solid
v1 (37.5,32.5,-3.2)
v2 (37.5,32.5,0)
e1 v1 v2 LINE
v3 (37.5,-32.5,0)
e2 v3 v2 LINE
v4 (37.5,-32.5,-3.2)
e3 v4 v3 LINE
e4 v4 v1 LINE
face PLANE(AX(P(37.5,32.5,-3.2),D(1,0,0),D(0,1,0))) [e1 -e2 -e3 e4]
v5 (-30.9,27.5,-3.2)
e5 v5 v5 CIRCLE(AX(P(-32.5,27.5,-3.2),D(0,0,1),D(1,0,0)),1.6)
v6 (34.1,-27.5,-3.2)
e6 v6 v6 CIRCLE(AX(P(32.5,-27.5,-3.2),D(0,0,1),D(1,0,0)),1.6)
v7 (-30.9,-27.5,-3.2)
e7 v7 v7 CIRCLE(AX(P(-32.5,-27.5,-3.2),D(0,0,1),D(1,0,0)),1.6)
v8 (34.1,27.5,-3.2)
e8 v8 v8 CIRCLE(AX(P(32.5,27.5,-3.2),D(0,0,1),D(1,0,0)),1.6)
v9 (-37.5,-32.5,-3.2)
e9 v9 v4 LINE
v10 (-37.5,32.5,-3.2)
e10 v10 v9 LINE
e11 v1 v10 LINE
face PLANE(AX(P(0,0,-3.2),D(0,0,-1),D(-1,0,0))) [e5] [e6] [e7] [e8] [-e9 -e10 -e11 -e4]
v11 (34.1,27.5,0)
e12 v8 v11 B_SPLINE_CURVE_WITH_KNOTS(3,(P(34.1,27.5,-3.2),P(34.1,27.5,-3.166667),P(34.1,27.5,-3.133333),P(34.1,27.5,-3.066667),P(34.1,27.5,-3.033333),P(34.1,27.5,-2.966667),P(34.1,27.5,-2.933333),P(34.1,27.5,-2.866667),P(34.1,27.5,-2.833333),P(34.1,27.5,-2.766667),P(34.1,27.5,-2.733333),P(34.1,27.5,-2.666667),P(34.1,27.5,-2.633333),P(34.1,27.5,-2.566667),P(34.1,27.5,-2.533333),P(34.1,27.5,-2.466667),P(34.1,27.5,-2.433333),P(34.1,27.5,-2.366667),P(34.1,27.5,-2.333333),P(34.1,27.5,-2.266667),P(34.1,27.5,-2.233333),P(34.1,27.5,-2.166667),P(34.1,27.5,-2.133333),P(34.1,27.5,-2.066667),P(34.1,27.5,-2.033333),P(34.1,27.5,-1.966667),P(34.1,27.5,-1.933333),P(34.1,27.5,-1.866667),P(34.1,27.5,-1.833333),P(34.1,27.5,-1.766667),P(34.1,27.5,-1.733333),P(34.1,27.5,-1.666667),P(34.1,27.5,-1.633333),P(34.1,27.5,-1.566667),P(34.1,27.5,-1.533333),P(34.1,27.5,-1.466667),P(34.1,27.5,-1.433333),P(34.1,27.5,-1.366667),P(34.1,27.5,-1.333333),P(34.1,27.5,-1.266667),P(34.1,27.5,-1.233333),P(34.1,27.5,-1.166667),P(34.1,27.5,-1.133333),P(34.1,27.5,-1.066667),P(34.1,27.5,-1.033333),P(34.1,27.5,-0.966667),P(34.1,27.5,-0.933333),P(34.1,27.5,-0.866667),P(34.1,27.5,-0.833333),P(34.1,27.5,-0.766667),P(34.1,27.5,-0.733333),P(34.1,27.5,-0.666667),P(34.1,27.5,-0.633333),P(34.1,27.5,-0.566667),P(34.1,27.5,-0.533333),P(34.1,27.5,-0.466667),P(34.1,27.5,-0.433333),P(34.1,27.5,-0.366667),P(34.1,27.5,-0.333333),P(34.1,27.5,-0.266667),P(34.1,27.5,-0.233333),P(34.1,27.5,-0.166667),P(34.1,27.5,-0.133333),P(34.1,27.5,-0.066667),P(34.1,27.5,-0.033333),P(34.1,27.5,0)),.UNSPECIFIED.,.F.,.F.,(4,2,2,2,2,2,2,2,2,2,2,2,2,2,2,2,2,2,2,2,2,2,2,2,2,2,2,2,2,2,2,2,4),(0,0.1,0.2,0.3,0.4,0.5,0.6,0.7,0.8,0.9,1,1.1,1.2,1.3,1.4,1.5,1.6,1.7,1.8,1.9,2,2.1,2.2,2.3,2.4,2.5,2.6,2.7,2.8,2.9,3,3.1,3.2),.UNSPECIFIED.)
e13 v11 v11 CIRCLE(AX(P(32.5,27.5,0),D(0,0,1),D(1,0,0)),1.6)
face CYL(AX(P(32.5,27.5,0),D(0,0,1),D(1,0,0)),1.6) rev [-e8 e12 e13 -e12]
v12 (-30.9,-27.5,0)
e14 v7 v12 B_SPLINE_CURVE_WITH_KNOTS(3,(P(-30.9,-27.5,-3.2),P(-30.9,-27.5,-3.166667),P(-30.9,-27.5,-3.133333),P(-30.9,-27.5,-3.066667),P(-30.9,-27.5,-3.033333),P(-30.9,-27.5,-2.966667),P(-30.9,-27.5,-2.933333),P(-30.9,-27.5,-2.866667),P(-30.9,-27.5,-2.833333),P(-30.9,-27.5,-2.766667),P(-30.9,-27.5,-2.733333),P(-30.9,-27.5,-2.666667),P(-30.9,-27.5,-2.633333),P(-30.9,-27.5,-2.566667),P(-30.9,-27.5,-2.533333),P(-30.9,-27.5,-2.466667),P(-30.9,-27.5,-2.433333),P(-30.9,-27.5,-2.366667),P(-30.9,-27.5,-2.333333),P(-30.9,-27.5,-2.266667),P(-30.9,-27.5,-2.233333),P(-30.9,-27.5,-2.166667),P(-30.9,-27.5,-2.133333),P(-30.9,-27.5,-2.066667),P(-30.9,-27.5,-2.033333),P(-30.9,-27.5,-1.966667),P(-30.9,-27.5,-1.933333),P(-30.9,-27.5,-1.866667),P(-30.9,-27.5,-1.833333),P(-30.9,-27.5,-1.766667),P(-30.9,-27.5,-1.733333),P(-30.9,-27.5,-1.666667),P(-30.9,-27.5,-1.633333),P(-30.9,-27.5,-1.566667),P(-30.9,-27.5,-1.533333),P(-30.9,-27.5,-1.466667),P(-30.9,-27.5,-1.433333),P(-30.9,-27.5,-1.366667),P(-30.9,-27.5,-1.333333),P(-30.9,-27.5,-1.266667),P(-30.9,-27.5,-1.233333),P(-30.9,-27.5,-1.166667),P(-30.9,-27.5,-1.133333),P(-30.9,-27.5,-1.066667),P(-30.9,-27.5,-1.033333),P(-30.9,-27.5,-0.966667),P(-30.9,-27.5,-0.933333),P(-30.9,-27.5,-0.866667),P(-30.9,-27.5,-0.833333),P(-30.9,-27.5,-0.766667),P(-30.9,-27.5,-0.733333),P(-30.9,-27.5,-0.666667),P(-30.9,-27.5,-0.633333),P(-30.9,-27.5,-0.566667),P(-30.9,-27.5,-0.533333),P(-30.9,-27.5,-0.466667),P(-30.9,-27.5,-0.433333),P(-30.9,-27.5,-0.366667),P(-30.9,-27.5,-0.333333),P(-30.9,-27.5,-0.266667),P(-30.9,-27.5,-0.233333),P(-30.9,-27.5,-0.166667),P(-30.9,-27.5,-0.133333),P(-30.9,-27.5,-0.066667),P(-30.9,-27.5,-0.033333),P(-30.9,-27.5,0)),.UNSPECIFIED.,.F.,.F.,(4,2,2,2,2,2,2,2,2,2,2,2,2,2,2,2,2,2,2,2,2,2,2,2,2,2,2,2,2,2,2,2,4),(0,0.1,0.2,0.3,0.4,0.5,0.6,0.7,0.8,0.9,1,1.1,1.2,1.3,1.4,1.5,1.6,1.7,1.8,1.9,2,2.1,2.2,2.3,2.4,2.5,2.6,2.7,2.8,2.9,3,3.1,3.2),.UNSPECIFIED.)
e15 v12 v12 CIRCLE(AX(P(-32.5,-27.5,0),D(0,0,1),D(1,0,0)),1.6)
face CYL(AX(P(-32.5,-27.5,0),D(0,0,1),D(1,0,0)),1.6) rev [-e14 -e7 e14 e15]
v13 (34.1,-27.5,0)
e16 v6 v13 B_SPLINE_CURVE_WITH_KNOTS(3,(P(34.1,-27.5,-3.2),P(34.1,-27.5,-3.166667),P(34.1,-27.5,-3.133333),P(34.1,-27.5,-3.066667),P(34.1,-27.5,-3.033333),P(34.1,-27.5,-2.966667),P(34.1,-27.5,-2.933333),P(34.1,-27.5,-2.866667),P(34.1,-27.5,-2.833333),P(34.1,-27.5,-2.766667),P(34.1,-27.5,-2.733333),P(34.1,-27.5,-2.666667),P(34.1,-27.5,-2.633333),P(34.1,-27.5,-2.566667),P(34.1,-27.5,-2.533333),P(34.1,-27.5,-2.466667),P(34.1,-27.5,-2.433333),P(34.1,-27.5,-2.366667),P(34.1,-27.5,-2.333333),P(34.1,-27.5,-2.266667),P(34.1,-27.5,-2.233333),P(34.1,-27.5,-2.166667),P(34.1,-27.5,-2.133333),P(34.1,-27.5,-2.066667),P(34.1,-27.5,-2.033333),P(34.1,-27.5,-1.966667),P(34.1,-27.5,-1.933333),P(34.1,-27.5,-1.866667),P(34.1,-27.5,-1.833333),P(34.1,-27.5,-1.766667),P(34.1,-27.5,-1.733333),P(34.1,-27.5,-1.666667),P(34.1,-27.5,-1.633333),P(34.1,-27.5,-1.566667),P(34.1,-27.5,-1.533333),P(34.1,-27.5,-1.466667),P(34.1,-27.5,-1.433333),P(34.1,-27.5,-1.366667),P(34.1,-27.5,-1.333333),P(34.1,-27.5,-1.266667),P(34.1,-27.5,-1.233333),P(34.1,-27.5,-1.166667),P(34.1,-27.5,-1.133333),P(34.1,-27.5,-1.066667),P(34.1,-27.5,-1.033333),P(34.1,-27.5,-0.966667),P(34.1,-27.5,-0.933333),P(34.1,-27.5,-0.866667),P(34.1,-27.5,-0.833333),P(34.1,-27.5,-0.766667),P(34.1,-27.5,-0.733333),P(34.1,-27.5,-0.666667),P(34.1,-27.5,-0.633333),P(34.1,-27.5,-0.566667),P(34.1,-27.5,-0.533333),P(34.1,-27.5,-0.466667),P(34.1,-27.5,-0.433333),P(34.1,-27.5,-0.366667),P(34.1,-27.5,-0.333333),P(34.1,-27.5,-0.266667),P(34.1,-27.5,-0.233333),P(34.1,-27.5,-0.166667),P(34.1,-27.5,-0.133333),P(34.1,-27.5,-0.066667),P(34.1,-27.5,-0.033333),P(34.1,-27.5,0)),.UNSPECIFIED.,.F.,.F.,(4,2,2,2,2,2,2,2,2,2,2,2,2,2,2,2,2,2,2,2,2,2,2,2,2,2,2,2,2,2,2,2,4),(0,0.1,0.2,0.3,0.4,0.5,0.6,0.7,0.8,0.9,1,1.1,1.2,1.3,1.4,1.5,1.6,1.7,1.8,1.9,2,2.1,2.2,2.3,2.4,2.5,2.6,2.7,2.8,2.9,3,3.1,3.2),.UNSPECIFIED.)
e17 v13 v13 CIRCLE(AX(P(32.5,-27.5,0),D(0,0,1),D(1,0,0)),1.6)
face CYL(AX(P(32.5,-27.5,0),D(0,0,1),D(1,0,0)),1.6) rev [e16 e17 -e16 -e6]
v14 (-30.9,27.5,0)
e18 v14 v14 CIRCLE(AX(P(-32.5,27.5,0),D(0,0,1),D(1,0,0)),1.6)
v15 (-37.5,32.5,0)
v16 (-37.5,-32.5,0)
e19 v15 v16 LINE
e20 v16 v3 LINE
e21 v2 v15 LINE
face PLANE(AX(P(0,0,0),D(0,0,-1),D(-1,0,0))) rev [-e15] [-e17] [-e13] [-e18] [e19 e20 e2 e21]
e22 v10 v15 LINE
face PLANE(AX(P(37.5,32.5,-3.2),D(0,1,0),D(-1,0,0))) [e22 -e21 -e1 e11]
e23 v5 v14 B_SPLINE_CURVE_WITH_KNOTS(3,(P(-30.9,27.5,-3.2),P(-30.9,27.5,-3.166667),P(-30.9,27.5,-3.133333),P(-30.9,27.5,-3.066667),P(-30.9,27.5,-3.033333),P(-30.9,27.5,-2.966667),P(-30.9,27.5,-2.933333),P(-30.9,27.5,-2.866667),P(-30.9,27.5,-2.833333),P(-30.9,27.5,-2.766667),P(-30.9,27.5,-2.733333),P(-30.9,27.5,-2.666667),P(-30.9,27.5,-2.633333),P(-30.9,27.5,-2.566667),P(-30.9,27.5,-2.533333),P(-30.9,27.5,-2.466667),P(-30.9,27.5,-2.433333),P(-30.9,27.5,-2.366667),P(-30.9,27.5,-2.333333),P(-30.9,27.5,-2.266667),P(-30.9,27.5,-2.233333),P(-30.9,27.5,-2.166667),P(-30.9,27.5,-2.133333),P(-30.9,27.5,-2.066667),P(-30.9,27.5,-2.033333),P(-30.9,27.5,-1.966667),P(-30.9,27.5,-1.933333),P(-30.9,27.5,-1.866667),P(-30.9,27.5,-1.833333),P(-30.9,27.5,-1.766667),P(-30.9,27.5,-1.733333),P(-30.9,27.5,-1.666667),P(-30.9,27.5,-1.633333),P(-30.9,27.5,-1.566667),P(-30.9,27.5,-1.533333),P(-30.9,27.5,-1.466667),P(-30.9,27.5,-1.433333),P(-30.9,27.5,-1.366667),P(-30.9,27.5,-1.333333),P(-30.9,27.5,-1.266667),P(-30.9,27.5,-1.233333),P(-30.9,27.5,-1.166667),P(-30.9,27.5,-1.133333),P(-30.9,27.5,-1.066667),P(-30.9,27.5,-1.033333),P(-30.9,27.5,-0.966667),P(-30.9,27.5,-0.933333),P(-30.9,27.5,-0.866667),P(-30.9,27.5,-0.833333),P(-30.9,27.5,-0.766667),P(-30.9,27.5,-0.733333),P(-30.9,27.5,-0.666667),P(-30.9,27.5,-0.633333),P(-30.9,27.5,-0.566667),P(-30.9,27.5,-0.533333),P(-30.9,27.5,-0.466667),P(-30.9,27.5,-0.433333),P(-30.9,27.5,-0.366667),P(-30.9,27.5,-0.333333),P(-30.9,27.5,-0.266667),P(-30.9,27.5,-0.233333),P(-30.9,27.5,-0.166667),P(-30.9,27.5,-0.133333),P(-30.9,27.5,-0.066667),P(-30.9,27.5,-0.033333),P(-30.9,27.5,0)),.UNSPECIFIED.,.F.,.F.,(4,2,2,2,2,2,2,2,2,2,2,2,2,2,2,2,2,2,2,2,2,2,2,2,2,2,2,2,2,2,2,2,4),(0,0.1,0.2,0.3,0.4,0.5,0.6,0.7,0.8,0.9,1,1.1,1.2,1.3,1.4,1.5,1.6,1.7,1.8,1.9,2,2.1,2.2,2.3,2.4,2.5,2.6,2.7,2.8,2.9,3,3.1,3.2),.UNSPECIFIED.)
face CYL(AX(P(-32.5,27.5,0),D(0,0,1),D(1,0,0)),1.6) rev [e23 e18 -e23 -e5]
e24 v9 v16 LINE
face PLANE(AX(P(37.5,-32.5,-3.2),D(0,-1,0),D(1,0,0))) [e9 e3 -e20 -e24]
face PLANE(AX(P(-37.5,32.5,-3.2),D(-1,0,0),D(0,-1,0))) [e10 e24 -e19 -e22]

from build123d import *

# Parameters (mm, degrees)
SKETCH1_W                  = 75
SKETCH1_H                  = 65
BASE_FLANGE1_DEPTH         = 3.2
F_3_2_3_2_DIAMETER_HOLE1_D = 3.2


# Sheet-metal steps are written as plain solids
with BuildPart() as part:
    # Sketch1 → Base-Flange1 (new body)
    with BuildSketch(Plane.XY):
        Rectangle(SKETCH1_W, SKETCH1_H)
    extrude(amount=-BASE_FLANGE1_DEPTH)

    # Ø3.2 (3.2) Diameter Hole1 (through all)
    with Locations(Plane.XY):
        with Locations((-32.5, 27.5), (-32.5, -27.5), (32.5, -27.5), (32.5, 27.5)):
            Hole(F_3_2_3_2_DIAMETER_HOLE1_D / 2)


solid = part.part
